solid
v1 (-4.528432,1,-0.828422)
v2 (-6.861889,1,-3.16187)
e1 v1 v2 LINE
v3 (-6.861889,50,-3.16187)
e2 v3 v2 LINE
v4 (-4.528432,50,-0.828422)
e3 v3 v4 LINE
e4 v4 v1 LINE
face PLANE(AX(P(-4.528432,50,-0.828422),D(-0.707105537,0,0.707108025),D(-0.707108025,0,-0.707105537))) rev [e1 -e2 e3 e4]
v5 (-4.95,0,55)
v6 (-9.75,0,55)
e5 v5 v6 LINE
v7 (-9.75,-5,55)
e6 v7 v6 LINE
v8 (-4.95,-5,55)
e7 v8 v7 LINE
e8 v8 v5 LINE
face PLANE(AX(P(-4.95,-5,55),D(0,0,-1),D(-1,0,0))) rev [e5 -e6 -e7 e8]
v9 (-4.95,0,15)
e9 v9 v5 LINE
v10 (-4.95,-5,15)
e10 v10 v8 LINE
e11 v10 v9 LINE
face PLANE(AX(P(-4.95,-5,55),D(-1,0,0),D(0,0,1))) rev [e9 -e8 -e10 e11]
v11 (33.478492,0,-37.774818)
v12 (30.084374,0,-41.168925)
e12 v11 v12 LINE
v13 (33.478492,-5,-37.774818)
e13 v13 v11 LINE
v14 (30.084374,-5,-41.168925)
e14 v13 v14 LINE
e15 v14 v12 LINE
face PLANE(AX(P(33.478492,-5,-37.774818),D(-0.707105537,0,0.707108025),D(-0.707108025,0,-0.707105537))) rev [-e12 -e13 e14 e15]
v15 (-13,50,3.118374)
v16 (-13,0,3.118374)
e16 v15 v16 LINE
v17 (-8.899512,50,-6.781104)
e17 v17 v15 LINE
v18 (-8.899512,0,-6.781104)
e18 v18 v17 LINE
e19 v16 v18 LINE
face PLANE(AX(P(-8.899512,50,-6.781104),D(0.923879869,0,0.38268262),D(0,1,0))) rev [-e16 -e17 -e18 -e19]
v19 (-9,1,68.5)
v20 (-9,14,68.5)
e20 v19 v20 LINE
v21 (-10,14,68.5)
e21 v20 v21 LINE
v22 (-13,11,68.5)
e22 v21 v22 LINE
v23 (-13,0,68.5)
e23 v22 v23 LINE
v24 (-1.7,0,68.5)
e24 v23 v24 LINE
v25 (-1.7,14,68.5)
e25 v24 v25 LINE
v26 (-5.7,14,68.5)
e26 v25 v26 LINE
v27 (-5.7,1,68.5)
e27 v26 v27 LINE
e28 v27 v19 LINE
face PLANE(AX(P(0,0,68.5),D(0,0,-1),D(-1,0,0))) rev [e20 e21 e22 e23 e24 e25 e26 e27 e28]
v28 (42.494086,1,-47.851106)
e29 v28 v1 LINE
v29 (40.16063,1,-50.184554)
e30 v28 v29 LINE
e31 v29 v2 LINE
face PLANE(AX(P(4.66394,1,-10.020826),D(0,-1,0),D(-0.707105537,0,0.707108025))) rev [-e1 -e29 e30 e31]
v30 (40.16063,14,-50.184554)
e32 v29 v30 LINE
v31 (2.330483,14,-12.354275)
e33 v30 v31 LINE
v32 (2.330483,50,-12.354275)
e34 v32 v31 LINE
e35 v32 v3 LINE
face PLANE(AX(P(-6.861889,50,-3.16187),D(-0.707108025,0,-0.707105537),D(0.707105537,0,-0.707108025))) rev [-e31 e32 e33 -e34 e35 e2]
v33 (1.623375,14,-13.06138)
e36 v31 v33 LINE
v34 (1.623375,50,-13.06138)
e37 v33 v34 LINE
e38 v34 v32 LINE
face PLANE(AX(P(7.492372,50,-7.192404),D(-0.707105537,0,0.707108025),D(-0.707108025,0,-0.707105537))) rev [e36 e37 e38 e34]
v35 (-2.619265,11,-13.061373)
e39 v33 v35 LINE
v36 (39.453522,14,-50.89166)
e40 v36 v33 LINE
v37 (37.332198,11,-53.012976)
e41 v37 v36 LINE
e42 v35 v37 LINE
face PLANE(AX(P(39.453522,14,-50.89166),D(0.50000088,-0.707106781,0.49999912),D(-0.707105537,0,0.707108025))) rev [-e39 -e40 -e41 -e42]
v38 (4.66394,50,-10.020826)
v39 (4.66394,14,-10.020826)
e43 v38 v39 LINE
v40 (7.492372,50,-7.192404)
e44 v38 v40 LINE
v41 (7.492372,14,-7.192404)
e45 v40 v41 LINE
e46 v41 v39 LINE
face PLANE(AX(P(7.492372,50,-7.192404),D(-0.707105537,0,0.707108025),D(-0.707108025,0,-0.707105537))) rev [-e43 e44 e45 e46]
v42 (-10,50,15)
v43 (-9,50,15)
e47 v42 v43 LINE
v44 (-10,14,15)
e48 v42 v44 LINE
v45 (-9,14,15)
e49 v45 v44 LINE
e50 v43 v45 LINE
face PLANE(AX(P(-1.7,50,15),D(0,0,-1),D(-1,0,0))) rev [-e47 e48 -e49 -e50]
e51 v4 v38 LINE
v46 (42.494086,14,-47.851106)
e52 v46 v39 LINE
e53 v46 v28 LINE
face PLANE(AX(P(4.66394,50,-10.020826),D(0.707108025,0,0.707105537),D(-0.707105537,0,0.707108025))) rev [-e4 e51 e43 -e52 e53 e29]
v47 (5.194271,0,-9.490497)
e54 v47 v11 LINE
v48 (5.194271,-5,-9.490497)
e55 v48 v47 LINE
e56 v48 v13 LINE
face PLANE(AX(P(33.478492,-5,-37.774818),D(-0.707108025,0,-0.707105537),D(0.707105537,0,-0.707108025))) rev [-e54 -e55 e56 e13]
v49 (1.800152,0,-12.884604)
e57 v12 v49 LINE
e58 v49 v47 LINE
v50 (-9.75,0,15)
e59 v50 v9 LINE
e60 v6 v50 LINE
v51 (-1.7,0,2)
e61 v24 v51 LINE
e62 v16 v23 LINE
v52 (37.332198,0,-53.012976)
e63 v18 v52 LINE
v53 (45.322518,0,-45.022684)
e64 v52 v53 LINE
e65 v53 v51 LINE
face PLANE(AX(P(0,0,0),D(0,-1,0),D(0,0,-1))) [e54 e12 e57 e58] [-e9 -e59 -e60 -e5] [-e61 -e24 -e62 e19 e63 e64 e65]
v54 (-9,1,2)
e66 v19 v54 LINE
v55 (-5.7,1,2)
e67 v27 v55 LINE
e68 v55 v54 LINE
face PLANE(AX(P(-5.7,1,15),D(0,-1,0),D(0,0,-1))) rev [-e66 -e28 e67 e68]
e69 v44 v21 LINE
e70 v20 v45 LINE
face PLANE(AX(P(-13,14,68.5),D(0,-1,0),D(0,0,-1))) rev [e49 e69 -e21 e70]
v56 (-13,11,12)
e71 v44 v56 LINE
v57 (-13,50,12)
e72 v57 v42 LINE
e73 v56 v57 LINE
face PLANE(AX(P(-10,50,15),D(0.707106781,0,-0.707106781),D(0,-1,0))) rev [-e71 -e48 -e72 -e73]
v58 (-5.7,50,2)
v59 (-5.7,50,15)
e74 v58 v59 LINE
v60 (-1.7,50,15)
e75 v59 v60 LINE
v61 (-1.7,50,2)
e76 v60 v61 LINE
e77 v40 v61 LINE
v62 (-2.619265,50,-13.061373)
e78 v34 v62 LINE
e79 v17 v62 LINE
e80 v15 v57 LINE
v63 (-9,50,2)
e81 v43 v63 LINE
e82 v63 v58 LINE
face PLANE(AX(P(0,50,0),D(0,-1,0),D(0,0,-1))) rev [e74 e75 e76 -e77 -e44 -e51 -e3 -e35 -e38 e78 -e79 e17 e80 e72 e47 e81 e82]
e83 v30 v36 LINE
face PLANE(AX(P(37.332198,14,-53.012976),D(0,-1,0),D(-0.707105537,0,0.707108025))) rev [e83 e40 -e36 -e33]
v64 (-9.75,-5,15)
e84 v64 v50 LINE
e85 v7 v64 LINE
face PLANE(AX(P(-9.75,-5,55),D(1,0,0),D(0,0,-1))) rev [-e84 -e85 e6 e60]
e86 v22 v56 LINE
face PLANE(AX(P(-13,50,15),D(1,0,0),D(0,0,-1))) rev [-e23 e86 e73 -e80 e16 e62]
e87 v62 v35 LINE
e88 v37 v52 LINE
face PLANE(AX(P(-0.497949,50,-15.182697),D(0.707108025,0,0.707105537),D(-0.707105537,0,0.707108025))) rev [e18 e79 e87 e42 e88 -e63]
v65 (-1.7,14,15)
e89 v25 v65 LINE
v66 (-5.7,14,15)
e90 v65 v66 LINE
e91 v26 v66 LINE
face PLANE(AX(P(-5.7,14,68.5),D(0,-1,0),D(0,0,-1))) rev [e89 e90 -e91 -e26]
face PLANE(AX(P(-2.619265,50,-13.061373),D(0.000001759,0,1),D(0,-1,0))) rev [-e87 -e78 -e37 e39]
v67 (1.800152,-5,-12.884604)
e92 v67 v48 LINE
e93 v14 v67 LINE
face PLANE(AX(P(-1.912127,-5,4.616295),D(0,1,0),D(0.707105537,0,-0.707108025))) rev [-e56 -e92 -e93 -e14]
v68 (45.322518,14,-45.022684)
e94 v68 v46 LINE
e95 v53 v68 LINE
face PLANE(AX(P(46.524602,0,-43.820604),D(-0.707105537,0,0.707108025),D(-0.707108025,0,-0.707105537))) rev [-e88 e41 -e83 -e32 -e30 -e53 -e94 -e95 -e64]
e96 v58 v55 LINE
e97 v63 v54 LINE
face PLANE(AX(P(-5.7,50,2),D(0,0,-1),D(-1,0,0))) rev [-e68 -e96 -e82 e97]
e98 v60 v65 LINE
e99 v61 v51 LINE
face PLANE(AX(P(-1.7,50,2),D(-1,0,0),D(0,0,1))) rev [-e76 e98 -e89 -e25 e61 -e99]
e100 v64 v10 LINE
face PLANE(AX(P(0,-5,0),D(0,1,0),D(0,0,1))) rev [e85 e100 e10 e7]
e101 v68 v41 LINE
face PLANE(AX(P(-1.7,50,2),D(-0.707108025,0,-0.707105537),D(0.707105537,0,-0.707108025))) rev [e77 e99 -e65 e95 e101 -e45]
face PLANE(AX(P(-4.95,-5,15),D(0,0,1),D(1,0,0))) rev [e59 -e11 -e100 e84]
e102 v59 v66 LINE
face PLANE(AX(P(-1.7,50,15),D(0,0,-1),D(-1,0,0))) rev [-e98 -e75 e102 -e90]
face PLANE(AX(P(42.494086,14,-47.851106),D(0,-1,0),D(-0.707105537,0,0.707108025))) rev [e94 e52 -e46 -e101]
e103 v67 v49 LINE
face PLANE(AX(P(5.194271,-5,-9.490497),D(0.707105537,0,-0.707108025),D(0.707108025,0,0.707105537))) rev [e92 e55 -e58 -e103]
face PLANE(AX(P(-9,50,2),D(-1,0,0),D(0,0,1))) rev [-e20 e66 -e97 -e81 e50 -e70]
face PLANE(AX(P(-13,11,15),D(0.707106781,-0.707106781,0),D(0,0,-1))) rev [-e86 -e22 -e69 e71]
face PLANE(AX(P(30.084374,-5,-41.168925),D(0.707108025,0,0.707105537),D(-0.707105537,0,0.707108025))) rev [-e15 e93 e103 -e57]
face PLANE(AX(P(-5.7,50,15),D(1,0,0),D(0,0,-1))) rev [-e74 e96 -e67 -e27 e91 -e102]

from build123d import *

# Parameters (mm, degrees)
BOSS_EXTRUDE1_DEPTH = 50
SKETCH3_W           = 3.3
SKETCH3_H           = 1
BOSS_EXTRUDE2_DEPTH = 13
BOSS_EXTRUDE3_DEPTH = 53.5
SKETCH6_W           = 4.8
SKETCH6_H           = 40
BOSS_EXTRUDE4_DEPTH = 5
CHAMFER1_START      = -14
CHAMFER1_OUTLINE_W  = 52
CHAMFER1_OUTLINE_H  = 13
CHAMFER1_DEPTH      = 3.182909169
CHAMFER2_SIZE       = 3


with BuildPart() as part:
    # Sketch2 → Boss-Extrude1 (new body)
    with BuildSketch(Plane(origin=(0, 0, 0), x_dir=(1, 0, 0), z_dir=(0, 1, 0))):
        Polygon((-1.7, -2), (-1.7, -15), (-5.7, -15), (-5.7, -2), (-9, -2), (-9, -15), (-13, -15), (-13, 2.680601608), align=None)
    extrude(amount=BOSS_EXTRUDE1_DEPTH)

    # Sketch3 → Boss-Extrude2 (add)
    with BuildSketch(Plane.XY.offset(2)):
        with Locations((-7.35, 0.5)):
            Rectangle(SKETCH3_W, SKETCH3_H)
    extrude(amount=BOSS_EXTRUDE2_DEPTH)

    # Sketch5 → Boss-Extrude3 (add)
    with BuildSketch(Plane.XY.offset(15)):
        Polygon((-13, 0), (-1.7, 0), (-1.7, 14), (-5.7, 14), (-5.7, 1), (-9, 1), (-9, 14), (-13, 14), align=None)
    extrude(amount=BOSS_EXTRUDE3_DEPTH)

    # Sketch6 → Boss-Extrude4 (add)
    with BuildSketch(Plane(origin=(0, 0, 0), x_dir=(-1, 0, 0), z_dir=(0, -1, 0))):
        with Locations((7.35, -35)):
            Rectangle(SKETCH6_W, SKETCH6_H)
    extrude(amount=BOSS_EXTRUDE4_DEPTH)

    # Mirror1: part across plane


with BuildPart() as part_1:
    add(part.part)
    add(part.part.mirror(Plane(origin=(-0.956063716, 0, 2.308147732), x_dir=(0.9238798691632129, 0, 0.38268261961443256), z_dir=(0.3826826196144326, 0, -0.9238798691632131))))

    # Chamfer1: read off the stored shape, not the designer's step
    # Chamfer1 outline → Chamfer1 (cut)
    with BuildSketch(Plane(origin=(0, 0, 0), x_dir=(0, 1, 0), z_dir=(0.9238798691632129, 0, 0.38268261961443295)).offset(CHAMFER1_START)):
        with Locations((25, 2.5)):
            Rectangle(CHAMFER1_OUTLINE_W, CHAMFER1_OUTLINE_H)
    extrude(amount=CHAMFER1_DEPTH, mode=Mode.SUBTRACT)

    # Chamfer2
    chamfer2_edges = [part_1.edges().sort_by_distance(p)[0] for p in [
        (-13, 32, 15),
        (-13, 14, 41.75),
        (-0.497948704, 32, -15.182696898),
        (18.417124413, 14, -34.097836574),
    ]]
    chamfer(chamfer2_edges, length=CHAMFER2_SIZE)


solid = part_1.part
